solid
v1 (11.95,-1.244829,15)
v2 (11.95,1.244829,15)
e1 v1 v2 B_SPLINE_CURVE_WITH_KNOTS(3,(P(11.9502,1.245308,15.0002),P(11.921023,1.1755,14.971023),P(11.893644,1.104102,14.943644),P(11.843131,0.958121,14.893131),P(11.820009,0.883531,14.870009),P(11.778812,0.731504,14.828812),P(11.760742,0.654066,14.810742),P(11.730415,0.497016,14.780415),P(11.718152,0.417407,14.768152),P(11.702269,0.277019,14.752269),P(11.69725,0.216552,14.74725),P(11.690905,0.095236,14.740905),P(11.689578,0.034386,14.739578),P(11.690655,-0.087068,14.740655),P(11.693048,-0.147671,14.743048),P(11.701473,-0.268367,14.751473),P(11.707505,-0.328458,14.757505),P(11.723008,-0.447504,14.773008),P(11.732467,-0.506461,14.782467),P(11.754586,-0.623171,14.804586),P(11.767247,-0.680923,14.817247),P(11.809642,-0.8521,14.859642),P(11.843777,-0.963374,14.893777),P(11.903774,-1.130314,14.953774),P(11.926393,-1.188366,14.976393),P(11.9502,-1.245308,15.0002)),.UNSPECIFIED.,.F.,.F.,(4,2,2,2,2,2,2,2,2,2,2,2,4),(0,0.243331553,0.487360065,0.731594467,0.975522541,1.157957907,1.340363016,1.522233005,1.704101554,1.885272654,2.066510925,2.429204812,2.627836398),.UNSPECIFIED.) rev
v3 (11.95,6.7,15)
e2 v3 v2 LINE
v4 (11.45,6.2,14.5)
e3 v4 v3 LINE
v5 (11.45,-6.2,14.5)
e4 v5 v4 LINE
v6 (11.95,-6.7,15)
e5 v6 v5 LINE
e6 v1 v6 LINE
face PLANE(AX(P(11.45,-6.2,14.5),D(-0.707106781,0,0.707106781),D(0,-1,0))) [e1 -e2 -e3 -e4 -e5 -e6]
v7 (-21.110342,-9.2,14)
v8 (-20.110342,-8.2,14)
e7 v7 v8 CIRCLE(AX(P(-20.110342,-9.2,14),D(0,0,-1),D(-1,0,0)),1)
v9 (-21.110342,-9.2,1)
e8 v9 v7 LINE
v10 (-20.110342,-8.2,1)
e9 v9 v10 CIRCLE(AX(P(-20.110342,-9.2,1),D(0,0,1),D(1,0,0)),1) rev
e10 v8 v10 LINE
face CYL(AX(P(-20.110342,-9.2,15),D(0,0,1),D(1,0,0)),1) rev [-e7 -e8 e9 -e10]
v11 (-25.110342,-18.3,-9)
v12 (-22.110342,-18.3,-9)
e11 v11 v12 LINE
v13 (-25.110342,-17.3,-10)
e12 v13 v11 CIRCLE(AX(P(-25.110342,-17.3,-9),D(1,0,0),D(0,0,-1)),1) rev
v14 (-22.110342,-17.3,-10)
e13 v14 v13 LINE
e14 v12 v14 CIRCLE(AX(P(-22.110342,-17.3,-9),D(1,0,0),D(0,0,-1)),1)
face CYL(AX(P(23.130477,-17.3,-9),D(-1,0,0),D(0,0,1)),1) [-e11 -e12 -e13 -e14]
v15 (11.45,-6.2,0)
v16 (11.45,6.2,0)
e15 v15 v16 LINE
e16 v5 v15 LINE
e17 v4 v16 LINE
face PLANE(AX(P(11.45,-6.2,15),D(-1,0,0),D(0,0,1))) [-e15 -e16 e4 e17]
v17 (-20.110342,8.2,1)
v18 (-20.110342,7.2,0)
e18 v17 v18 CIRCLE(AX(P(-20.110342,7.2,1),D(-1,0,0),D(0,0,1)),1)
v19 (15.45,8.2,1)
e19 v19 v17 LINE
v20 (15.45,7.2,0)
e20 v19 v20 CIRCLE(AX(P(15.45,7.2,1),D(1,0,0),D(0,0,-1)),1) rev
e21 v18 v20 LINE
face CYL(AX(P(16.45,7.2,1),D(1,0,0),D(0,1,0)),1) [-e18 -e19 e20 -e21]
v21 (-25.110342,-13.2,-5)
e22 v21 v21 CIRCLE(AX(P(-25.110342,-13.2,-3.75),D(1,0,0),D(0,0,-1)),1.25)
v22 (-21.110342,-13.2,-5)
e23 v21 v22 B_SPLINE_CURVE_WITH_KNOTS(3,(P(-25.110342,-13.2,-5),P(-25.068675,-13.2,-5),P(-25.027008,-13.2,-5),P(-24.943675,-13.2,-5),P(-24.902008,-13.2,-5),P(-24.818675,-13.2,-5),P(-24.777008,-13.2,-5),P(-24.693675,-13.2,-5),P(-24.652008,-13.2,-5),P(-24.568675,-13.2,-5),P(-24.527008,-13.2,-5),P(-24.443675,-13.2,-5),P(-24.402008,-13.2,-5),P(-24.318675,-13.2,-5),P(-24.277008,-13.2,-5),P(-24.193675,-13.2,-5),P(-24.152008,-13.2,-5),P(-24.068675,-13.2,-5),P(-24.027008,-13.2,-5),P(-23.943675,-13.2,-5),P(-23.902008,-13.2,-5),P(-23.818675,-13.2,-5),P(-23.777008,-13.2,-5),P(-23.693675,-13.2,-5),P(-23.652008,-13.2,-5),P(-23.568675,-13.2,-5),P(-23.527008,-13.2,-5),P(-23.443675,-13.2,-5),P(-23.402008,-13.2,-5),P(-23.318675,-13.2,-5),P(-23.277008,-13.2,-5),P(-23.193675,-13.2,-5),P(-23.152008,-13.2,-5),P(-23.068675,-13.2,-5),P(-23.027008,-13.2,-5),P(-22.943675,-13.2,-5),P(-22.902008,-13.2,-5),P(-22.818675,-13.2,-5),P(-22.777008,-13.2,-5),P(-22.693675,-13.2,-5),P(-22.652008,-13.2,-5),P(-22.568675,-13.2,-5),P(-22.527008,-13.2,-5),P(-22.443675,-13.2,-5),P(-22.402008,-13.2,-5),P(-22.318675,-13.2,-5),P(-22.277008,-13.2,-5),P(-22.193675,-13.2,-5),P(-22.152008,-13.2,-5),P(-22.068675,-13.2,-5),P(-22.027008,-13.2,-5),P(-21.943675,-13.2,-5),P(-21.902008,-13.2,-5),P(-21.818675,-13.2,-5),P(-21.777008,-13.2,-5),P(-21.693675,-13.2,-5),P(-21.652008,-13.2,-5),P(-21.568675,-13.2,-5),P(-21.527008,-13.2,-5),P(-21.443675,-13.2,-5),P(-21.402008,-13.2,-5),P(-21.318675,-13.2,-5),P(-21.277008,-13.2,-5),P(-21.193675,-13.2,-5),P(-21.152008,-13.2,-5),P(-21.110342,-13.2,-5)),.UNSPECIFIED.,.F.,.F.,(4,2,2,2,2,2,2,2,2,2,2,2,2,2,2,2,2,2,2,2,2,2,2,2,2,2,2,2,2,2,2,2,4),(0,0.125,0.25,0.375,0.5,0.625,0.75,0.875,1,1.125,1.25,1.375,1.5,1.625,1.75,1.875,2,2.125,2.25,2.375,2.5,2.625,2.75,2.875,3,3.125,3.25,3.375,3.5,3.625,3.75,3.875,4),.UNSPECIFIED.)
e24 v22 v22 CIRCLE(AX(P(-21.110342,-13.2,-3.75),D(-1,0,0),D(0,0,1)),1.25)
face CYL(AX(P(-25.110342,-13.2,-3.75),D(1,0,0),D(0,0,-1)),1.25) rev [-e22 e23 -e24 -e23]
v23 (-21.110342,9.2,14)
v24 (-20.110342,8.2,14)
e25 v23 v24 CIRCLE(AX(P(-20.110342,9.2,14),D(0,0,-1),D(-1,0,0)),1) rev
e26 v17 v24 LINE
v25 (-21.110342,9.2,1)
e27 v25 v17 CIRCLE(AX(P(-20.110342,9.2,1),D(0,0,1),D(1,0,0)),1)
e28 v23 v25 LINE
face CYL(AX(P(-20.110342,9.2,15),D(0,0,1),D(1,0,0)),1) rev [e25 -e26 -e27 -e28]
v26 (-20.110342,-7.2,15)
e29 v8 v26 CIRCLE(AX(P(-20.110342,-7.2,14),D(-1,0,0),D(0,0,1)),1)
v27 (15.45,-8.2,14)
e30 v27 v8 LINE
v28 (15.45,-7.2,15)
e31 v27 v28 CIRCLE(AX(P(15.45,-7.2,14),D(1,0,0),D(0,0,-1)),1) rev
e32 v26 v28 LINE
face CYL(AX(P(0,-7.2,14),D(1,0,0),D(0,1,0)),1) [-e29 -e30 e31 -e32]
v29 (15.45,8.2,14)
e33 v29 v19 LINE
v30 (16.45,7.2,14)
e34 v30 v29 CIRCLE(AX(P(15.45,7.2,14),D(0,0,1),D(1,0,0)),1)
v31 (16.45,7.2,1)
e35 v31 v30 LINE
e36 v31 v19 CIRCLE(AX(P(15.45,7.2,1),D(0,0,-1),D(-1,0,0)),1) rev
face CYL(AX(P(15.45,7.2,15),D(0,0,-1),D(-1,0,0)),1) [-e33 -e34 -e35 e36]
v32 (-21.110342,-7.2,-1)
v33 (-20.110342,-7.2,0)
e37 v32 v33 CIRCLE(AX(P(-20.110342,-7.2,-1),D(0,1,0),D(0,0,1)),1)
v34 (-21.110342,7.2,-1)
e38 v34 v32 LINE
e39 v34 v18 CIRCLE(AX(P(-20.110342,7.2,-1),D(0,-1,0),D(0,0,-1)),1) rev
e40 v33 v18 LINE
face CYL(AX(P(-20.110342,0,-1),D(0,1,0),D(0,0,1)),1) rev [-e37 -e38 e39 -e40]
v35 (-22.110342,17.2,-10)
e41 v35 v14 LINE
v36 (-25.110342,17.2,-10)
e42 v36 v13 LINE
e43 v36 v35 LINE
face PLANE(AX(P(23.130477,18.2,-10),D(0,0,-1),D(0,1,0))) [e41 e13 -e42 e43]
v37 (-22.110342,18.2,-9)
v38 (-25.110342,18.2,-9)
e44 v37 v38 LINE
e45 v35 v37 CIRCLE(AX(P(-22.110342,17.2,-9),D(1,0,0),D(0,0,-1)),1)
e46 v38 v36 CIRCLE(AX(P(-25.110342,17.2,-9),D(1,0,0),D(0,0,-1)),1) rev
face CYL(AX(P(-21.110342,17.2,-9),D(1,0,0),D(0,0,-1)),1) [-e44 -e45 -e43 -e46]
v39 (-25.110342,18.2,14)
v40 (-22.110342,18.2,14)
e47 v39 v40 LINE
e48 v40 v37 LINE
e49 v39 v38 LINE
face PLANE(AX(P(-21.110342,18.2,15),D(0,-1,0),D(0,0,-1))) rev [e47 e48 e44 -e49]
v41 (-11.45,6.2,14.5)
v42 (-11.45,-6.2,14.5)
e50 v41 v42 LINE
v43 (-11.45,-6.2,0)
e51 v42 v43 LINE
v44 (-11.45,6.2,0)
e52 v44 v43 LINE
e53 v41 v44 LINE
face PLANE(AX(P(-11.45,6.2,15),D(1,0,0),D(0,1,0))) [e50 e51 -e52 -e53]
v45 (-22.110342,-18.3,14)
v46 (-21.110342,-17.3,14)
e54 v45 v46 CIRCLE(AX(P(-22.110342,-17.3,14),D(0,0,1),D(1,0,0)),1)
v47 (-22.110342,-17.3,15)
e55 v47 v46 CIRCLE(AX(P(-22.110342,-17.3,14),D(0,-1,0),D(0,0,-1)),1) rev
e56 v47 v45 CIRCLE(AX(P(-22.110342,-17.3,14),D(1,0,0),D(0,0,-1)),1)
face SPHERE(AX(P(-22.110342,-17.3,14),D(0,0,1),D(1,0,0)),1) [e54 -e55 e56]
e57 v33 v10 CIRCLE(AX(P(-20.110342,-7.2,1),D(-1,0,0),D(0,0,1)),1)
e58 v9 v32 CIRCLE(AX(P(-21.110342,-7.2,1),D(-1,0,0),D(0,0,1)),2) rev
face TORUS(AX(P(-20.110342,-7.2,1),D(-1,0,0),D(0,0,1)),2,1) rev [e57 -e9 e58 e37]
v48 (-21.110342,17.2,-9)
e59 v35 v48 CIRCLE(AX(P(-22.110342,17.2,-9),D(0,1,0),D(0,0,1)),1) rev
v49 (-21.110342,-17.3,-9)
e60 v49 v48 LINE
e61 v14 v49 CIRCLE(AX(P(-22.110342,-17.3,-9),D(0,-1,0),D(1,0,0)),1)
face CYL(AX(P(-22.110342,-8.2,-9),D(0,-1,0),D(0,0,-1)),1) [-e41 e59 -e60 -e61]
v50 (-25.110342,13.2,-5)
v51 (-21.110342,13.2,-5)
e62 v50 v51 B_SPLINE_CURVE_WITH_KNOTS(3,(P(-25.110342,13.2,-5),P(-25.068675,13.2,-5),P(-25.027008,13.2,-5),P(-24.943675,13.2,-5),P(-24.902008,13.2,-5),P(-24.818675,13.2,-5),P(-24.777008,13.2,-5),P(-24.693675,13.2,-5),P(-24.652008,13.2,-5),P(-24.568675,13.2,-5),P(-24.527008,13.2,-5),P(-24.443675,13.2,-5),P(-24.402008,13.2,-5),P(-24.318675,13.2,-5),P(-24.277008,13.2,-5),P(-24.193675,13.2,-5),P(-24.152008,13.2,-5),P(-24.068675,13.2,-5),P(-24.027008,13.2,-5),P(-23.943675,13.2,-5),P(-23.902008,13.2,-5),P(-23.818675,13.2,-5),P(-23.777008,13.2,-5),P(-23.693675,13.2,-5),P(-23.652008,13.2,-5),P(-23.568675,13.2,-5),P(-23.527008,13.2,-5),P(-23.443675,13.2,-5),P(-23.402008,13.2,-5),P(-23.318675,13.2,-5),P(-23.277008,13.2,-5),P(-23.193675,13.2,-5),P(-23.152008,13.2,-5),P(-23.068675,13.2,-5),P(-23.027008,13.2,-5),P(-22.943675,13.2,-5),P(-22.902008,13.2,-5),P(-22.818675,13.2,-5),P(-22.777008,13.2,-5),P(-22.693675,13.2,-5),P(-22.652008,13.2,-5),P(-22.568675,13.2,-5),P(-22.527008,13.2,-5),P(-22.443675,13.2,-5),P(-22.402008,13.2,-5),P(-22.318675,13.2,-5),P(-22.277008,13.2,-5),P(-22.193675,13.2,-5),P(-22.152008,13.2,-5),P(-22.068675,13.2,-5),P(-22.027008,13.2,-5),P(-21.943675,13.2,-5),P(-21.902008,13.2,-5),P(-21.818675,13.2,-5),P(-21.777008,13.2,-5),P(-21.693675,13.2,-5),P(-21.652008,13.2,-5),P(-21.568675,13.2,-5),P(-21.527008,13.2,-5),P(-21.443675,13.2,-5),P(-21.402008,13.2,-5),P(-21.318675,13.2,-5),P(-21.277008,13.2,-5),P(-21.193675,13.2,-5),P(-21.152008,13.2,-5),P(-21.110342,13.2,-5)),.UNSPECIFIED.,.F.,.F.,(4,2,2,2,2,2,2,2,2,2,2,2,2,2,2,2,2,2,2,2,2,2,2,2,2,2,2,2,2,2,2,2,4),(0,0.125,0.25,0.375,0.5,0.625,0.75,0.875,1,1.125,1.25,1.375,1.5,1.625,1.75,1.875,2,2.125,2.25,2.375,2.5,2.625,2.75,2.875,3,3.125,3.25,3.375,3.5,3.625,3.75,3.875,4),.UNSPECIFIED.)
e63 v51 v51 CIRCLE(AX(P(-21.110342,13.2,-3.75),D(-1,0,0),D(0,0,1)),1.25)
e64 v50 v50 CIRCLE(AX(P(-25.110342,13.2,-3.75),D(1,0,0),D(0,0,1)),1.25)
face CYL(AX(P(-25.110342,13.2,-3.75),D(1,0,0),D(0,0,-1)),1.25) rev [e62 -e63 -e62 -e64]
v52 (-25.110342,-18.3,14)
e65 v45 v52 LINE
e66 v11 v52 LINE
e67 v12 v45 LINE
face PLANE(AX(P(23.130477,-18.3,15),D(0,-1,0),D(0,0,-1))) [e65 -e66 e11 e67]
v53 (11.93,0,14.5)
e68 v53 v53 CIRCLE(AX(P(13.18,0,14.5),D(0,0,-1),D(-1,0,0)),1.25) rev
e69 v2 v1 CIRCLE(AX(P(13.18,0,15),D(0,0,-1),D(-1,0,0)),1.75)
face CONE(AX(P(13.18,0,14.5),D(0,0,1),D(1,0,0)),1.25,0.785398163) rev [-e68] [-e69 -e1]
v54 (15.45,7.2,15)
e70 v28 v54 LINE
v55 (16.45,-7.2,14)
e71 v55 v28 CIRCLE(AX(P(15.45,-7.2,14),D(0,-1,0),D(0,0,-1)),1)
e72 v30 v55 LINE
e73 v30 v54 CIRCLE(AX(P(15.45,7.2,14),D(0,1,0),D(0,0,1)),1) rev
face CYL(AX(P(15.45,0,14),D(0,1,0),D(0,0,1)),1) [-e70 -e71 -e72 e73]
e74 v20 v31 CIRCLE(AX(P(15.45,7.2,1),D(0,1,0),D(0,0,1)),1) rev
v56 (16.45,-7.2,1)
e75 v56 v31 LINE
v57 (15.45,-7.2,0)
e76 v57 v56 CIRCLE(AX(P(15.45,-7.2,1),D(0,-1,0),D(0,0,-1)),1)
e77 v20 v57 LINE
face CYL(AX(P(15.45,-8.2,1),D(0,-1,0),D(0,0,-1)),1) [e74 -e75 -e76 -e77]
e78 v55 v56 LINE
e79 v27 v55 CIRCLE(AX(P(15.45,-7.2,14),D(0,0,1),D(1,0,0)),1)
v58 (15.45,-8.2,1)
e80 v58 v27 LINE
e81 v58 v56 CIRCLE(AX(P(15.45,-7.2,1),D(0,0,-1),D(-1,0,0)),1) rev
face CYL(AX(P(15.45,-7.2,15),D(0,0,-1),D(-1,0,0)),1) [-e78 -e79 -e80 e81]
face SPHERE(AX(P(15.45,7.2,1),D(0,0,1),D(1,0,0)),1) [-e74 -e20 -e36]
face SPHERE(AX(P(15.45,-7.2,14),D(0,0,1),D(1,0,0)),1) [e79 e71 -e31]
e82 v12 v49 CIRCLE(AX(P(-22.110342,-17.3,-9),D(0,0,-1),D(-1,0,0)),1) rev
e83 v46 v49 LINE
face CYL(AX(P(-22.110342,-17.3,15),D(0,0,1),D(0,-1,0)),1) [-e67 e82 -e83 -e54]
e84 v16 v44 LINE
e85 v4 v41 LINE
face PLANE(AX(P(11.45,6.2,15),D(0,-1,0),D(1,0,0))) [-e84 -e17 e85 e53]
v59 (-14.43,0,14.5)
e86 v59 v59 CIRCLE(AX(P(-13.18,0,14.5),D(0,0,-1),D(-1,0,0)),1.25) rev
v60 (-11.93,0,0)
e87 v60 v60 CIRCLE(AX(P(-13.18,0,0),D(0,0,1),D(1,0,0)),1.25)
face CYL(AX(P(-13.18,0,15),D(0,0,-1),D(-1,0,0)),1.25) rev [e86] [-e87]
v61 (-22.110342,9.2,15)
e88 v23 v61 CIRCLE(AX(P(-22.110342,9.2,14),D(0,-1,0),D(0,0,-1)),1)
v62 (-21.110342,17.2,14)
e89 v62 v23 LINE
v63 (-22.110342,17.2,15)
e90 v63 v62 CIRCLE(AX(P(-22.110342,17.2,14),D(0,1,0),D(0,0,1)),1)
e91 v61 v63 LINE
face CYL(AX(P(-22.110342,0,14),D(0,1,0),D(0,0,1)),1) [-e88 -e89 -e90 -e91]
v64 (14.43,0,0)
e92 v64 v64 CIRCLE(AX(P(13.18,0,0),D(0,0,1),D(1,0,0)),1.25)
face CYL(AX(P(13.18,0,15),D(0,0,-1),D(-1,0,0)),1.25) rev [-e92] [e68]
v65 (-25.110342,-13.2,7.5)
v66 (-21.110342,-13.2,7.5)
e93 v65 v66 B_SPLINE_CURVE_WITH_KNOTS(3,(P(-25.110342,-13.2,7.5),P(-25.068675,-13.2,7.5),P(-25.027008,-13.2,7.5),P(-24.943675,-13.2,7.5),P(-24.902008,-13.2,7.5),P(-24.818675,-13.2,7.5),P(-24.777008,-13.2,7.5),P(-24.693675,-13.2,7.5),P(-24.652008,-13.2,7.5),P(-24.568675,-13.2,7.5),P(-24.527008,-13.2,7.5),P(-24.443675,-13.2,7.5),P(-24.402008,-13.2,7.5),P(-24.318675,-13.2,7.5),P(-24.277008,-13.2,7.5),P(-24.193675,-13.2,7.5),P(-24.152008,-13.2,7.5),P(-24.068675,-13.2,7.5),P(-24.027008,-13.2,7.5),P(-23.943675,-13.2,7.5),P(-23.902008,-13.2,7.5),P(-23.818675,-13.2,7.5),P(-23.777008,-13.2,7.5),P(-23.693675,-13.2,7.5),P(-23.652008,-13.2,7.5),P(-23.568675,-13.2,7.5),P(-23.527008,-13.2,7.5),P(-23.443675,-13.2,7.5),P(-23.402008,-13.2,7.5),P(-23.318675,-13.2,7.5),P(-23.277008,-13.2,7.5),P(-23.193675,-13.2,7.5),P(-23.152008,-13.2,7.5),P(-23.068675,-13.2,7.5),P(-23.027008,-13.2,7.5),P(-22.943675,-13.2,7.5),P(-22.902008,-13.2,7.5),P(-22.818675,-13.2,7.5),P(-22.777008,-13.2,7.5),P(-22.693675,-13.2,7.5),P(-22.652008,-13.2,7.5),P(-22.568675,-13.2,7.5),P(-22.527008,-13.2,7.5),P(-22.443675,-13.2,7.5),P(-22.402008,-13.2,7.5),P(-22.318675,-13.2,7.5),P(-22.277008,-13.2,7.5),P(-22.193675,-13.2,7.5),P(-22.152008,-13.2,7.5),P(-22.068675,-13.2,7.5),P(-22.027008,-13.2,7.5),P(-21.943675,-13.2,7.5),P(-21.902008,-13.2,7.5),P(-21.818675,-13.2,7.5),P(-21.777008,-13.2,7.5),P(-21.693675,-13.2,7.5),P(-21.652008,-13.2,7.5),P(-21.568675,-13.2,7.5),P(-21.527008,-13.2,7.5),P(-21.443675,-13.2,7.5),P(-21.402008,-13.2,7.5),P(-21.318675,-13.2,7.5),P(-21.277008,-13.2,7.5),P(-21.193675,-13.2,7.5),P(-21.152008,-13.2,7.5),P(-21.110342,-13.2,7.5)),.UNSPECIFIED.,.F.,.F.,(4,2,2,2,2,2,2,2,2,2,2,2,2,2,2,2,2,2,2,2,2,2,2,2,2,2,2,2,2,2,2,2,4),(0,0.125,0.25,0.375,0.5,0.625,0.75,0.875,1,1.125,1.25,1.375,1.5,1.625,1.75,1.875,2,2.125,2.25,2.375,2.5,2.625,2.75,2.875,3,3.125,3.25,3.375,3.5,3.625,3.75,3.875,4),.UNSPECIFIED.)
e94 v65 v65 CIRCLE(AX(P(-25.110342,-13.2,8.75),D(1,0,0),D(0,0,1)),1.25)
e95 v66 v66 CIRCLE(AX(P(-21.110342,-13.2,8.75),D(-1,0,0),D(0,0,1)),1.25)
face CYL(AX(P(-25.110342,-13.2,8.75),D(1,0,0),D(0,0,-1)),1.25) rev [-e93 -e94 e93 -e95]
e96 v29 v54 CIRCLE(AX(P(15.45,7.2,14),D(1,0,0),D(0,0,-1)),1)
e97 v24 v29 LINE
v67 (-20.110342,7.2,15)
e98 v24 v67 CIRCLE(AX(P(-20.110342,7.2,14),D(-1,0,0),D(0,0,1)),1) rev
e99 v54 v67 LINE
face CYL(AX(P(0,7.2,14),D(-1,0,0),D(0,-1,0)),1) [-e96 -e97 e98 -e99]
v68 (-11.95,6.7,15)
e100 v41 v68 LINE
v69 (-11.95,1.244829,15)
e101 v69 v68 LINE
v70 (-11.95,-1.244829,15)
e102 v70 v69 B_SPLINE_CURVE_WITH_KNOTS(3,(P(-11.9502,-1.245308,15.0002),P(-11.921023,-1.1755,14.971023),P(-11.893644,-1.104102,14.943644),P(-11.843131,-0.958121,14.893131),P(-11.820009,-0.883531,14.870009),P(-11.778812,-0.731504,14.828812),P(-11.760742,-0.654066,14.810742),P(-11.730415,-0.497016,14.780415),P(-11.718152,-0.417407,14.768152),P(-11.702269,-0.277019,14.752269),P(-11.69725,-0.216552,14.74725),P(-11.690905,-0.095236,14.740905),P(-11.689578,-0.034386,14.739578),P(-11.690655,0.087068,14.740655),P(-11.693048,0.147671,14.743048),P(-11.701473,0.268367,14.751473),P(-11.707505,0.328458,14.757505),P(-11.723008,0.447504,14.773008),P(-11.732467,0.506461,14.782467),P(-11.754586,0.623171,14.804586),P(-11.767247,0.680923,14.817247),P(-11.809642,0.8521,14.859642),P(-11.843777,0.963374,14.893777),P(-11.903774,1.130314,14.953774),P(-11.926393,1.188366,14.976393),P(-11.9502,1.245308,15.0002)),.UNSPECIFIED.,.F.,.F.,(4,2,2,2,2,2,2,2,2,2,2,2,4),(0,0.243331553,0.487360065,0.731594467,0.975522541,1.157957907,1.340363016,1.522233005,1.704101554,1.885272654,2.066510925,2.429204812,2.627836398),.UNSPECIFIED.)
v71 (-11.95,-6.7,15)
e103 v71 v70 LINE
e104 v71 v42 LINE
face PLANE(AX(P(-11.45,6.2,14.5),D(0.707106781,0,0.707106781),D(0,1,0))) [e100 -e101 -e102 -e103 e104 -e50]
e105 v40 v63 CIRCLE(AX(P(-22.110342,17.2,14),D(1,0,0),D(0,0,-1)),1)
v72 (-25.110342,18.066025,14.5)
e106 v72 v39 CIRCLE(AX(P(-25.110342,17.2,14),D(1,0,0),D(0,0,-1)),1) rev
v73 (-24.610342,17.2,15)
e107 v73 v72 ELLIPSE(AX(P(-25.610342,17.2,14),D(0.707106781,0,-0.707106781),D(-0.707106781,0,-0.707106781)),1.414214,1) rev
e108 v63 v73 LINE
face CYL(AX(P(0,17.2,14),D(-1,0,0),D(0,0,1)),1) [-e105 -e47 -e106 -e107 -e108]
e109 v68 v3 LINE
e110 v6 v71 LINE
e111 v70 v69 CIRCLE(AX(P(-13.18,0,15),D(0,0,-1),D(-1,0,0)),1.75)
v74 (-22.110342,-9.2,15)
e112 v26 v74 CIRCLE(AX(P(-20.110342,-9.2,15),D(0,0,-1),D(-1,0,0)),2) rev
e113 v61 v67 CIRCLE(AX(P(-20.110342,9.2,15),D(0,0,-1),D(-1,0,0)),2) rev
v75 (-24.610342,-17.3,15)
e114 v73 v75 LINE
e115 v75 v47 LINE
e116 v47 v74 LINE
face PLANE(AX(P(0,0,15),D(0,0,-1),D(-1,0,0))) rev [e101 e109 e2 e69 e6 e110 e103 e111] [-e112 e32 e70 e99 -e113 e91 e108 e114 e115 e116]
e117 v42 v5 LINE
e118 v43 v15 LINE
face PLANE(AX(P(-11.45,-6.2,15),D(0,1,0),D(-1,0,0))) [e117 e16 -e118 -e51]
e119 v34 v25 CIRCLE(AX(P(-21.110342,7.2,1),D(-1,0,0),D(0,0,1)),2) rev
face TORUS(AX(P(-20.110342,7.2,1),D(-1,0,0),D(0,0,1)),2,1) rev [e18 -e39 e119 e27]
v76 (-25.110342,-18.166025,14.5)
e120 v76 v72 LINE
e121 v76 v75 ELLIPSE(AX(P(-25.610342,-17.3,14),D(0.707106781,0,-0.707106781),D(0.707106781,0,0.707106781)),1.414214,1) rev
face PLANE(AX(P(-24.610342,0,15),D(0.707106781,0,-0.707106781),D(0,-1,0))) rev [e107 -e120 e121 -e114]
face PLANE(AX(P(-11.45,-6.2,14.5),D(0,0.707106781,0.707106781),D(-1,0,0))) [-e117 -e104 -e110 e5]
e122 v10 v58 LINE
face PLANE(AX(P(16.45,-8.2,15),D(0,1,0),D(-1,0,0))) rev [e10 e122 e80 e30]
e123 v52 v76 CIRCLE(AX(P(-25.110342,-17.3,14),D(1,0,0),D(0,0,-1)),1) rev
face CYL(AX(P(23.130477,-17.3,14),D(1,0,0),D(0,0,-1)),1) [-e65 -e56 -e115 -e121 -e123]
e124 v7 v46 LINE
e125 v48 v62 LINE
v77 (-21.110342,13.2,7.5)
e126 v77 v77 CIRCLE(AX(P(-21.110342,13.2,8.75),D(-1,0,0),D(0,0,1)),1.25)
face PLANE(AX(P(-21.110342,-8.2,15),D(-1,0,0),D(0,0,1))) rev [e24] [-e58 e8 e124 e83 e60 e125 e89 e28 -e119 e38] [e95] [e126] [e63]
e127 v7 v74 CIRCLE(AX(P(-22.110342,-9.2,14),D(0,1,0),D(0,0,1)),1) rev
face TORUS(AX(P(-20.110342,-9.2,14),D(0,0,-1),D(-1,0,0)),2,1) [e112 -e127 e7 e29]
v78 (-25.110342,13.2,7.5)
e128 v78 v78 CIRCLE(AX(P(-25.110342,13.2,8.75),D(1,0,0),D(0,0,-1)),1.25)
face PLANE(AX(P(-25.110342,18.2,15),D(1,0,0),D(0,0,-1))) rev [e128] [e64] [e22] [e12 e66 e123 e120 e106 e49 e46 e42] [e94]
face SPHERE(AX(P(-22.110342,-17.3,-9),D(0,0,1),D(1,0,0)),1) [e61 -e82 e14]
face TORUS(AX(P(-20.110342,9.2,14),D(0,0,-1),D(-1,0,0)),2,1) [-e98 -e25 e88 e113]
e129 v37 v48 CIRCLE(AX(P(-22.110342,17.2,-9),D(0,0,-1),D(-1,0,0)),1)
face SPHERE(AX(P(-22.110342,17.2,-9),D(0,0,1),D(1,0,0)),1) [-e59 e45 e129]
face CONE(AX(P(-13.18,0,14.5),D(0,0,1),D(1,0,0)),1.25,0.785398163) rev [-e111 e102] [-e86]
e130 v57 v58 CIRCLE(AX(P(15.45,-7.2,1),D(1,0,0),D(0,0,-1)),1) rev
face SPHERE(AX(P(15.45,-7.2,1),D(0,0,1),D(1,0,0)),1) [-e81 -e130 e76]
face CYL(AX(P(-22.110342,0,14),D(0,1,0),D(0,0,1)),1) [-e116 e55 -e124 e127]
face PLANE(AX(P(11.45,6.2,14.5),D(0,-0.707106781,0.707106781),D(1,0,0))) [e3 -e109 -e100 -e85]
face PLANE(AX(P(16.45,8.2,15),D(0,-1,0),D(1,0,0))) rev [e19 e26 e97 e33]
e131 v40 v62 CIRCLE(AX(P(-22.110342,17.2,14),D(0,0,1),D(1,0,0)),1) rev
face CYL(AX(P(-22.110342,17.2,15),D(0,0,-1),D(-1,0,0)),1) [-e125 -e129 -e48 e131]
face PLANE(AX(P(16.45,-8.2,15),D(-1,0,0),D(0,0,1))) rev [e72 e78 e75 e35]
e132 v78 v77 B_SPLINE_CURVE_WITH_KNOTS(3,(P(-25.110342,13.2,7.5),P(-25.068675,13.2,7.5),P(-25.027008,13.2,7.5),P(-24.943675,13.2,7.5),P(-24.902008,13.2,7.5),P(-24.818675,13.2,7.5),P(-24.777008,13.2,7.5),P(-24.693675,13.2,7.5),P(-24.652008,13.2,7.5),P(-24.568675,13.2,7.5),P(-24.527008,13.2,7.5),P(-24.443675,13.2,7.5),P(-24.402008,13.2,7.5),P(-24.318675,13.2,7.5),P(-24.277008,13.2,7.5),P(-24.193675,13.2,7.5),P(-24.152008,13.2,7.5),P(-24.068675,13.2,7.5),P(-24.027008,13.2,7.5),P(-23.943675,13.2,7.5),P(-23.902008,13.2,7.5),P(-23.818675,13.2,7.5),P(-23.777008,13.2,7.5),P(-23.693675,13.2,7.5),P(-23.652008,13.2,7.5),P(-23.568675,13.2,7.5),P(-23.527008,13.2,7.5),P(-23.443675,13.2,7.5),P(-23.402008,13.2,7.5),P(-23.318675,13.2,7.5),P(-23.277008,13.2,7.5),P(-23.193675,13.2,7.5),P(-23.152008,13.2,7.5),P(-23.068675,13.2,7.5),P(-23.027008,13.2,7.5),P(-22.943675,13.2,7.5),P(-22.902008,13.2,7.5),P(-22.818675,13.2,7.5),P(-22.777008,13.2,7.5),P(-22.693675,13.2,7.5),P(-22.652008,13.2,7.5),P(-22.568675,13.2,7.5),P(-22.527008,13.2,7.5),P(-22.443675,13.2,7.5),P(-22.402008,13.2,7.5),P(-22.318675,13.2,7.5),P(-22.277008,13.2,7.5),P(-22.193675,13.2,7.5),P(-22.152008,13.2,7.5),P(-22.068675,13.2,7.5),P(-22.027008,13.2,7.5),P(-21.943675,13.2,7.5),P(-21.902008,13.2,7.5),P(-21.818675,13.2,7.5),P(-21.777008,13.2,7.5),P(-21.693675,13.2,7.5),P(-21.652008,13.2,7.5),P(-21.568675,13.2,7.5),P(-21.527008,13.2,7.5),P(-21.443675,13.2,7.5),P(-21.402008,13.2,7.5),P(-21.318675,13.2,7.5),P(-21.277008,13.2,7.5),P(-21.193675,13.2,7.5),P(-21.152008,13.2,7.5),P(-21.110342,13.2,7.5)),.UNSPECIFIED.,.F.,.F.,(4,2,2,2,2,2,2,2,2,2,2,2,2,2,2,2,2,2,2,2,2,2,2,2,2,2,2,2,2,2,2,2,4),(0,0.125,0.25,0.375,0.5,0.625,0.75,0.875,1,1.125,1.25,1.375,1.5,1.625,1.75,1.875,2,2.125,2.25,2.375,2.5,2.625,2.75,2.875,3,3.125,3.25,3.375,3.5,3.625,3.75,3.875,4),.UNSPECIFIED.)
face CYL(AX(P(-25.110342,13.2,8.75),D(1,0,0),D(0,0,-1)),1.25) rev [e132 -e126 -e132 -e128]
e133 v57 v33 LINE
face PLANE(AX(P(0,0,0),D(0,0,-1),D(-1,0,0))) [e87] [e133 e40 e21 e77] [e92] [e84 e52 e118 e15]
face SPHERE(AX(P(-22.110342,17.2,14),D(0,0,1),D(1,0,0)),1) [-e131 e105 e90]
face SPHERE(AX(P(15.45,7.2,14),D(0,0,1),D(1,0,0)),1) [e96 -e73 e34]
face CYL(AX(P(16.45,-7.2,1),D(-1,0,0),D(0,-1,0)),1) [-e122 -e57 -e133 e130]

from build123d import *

# Parameters (mm, degrees)
SKETCH1_R           = 1.25
SKETCH1_W           = 22.9
SKETCH1_H           = 12.4
BOSS_EXTRUDE1_DEPTH = 15
SKETCH4_W           = 25
SKETCH4_H           = 36.5
BOSS_EXTRUDE2_DEPTH = 4
SKETCH3_R           = 1.25
CUT_EXTRUDE1_DEPTH  = 35.502452959
CHAMFER1_SIZE       = 0.5
FILLET1_R           = 1


with BuildPart() as part:
    # Sketch1 → Boss-Extrude1 (new body)
    with BuildSketch(Plane.XY):
        Polygon((16.45, -8.2), (16.45, 8.2), (-21.110341698, 8.2), (-21.110341698, 18.2), (-25.110341698, 18.2), (-25.110341698, -18.2), (-21.110341698, -18.2), (-21.110341698, -8.2), align=None)
        with Locations((13.18, 0)):
            Circle(SKETCH1_R, mode=Mode.SUBTRACT)
        with Locations((-13.18, 0)):
            Circle(SKETCH1_R, mode=Mode.SUBTRACT)
        Rectangle(SKETCH1_W, SKETCH1_H, mode=Mode.SUBTRACT)
    extrude(amount=BOSS_EXTRUDE1_DEPTH)

    # Sketch4 → Boss-Extrude2 (add)
    with BuildSketch(Plane.ZY.offset(25.110341698)):
        with Locations((2.5, -0.05)):
            Rectangle(SKETCH4_W, SKETCH4_H)
    extrude(amount=-BOSS_EXTRUDE2_DEPTH)

    # Sketch3 → Cut-Extrude1 (cut, through all)
    with BuildSketch(Plane(origin=(0, 0, 0), x_dir=(0, 0, -1), z_dir=(1, 0, 0))):
        with Locations((-8.75, 13.2)):
            Circle(SKETCH3_R)
        with Locations((3.75, 13.2)):
            Circle(SKETCH3_R)
        with Locations((3.75, -13.2)):
            Circle(SKETCH3_R)
        with Locations((-8.75, -13.2)):
            Circle(SKETCH3_R)
    extrude(amount=-CUT_EXTRUDE1_DEPTH, mode=Mode.SUBTRACT)

    # Chamfer1
    # the kernel refuses this chamfer: 0.5 mm, written as the material it takes off along each edge
    with BuildSketch(Plane(origin=(-25.110341698, 19.485841494, 15), x_dir=(0.9996219169112968, 0, 0.02749587661058555), z_dir=(0, -1, 0))) as chamfer1_piece_1:
        Polygon((CHAMFER1_SIZE * 0.999621916911, -CHAMFER1_SIZE * 0.0274958766106), (-CHAMFER1_SIZE * 0.0274958766106, -CHAMFER1_SIZE * 0.999621916911), (0, 0), align=None)
    extrude(amount=39.071682988, mode=Mode.SUBTRACT)
    with BuildSketch(Plane(origin=(11.45, -6.2, 15), x_dir=(0.9996219169112968, 0, 0.02749587661058574), z_dir=(0, 1, 0)), Plane(origin=(-11.45, 6.2, 15), x_dir=(-0.9996219169112968, 0, 0.027495876610585647), z_dir=(0, -1, 0))) as chamfer1_piece_2:
        Polygon((CHAMFER1_SIZE * 0.999621916911, CHAMFER1_SIZE * 0.0274958766106), (-CHAMFER1_SIZE * 0.0274958766106, CHAMFER1_SIZE * 0.999621916911), (0, 0), align=None)
    extrude(amount=12.4, mode=Mode.SUBTRACT)
    with BuildSketch(Plane(origin=(11.45, 6.2, 15), x_dir=(0, 0.9996219169112968, 0.027495876610585647), z_dir=(-1, 0, 0)), Plane(origin=(-11.45, -6.2, 15), x_dir=(0, -0.9996219169112968, 0.027495876610585647), z_dir=(1, 0, 0))) as chamfer1_piece_3:
        Polygon((CHAMFER1_SIZE * 0.999621916911, CHAMFER1_SIZE * 0.0274958766106), (-CHAMFER1_SIZE * 0.0274958766106, CHAMFER1_SIZE * 0.999621916911), (0, 0), align=None)
    extrude(amount=22.9, mode=Mode.SUBTRACT)
    with BuildSketch(Plane(origin=(13.18, 0, 15), x_dir=(1, 0, 0), z_dir=(0, -1, 0))) as chamfer1_piece_4:
        Polygon((1.25 + CHAMFER1_SIZE, 0), (1.25, -CHAMFER1_SIZE), (1.25, 0), align=None)
    revolve(axis=Axis((13.18, 0, 15), (0, 0, 1)), mode=Mode.SUBTRACT)
    with BuildSketch(Plane(origin=(-13.18, 0, 15), x_dir=(1, 0, 0), z_dir=(0, -1, 0))) as chamfer1_piece_5:
        Polygon((1.25 + CHAMFER1_SIZE, 0), (1.25, -CHAMFER1_SIZE), (1.25, 0), align=None)
    revolve(axis=Axis((-13.18, 0, 15), (0, 0, 1)), mode=Mode.SUBTRACT)
    with BuildSketch(Plane(origin=(11.45, -7.485841494, 15), x_dir=(0.9996219169112968, 0, 0.027495876610585647), z_dir=(0, 1, 0))) as chamfer1_piece_6a_section:
        Polygon((CHAMFER1_SIZE * 0.999621916911, CHAMFER1_SIZE * 0.0274958766106), (-CHAMFER1_SIZE * 0.0274958766106, CHAMFER1_SIZE * 0.999621916911), (0, 0), align=None)
    chamfer1_piece_6a = extrude(amount=13.685841494, mode=Mode.PRIVATE)
    chamfer1_piece_6a = split(chamfer1_piece_6a, bisect_by=Plane(origin=(11.614896813, -6.2, 14.835103187), z_dir=(0, -1, 0)), keep=Keep.TOP, mode=Mode.PRIVATE)
    with BuildSketch(Plane(origin=(-11.45, -6.2, 15), x_dir=(0, -0.9996219169112968, 0.027495876610585647), z_dir=(1, 0, 0))) as chamfer1_piece_6b_section:
        Polygon((CHAMFER1_SIZE * 0.999621916911, CHAMFER1_SIZE * 0.0274958766106), (-CHAMFER1_SIZE * 0.0274958766106, CHAMFER1_SIZE * 0.999621916911), (0, 0), align=None)
    chamfer1_piece_6b = extrude(amount=24.185841494, mode=Mode.PRIVATE)
    chamfer1_piece_6b = split(chamfer1_piece_6b, bisect_by=Plane(origin=(11.45, -6.364896813, 14.835103187), z_dir=(1, 0, 0)), keep=Keep.TOP, mode=Mode.PRIVATE)
    chamfer1_piece_6 = chamfer1_piece_6a & chamfer1_piece_6b
    add(chamfer1_piece_6, mode=Mode.SUBTRACT)
    with BuildSketch(Plane(origin=(11.45, -6.2, 15), x_dir=(0.9996219169112968, 0, 0.02749587661058574), z_dir=(0, 1, 0))) as chamfer1_piece_7a_section:
        Polygon((CHAMFER1_SIZE * 0.999621916911, CHAMFER1_SIZE * 0.0274958766106), (-CHAMFER1_SIZE * 0.0274958766106, CHAMFER1_SIZE * 0.999621916911), (0, 0), align=None)
    chamfer1_piece_7a = extrude(amount=13.685841494, mode=Mode.PRIVATE)
    chamfer1_piece_7a = split(chamfer1_piece_7a, bisect_by=Plane(origin=(11.614896813, 6.2, 14.835103187), z_dir=(0, 1, 0)), keep=Keep.TOP, mode=Mode.PRIVATE)
    with BuildSketch(Plane(origin=(12.735841494, 6.2, 15), x_dir=(0, 0.9996219169112968, 0.027495876610585647), z_dir=(-1, 0, 0))) as chamfer1_piece_7b_section:
        Polygon((CHAMFER1_SIZE * 0.999621916911, CHAMFER1_SIZE * 0.0274958766106), (-CHAMFER1_SIZE * 0.0274958766106, CHAMFER1_SIZE * 0.999621916911), (0, 0), align=None)
    chamfer1_piece_7b = extrude(amount=24.185841494, mode=Mode.PRIVATE)
    chamfer1_piece_7b = split(chamfer1_piece_7b, bisect_by=Plane(origin=(11.45, 6.364896813, 14.835103187), z_dir=(1, 0, 0)), keep=Keep.TOP, mode=Mode.PRIVATE)
    chamfer1_piece_7 = chamfer1_piece_7a & chamfer1_piece_7b
    add(chamfer1_piece_7, mode=Mode.SUBTRACT)
    with BuildSketch(Plane(origin=(-11.45, 7.485841494, 15), x_dir=(-0.9996219169112968, 0, 0.027495876610585647), z_dir=(0, -1, 0))) as chamfer1_piece_8a_section:
        Polygon((CHAMFER1_SIZE * 0.999621916911, CHAMFER1_SIZE * 0.0274958766106), (-CHAMFER1_SIZE * 0.0274958766106, CHAMFER1_SIZE * 0.999621916911), (0, 0), align=None)
    chamfer1_piece_8a = extrude(amount=13.685841494, mode=Mode.PRIVATE)
    chamfer1_piece_8a = split(chamfer1_piece_8a, bisect_by=Plane(origin=(-11.614896813, 6.2, 14.835103187), z_dir=(0, 1, 0)), keep=Keep.TOP, mode=Mode.PRIVATE)
    with BuildSketch(Plane(origin=(11.45, 6.2, 15), x_dir=(0, 0.9996219169112968, 0.027495876610585647), z_dir=(-1, 0, 0))) as chamfer1_piece_8b_section:
        Polygon((CHAMFER1_SIZE * 0.999621916911, CHAMFER1_SIZE * 0.0274958766106), (-CHAMFER1_SIZE * 0.0274958766106, CHAMFER1_SIZE * 0.999621916911), (0, 0), align=None)
    chamfer1_piece_8b = extrude(amount=24.185841494, mode=Mode.PRIVATE)
    chamfer1_piece_8b = split(chamfer1_piece_8b, bisect_by=Plane(origin=(-11.45, 6.364896813, 14.835103187), z_dir=(-1, 0, 0)), keep=Keep.TOP, mode=Mode.PRIVATE)
    chamfer1_piece_8 = chamfer1_piece_8a & chamfer1_piece_8b
    add(chamfer1_piece_8, mode=Mode.SUBTRACT)
    with BuildSketch(Plane(origin=(-12.735841494, -6.2, 15), x_dir=(0, -0.9996219169112968, 0.027495876610585647), z_dir=(1, 0, 0))) as chamfer1_piece_9a_section:
        Polygon((CHAMFER1_SIZE * 0.999621916911, CHAMFER1_SIZE * 0.0274958766106), (-CHAMFER1_SIZE * 0.0274958766106, CHAMFER1_SIZE * 0.999621916911), (0, 0), align=None)
    chamfer1_piece_9a = extrude(amount=24.185841494, mode=Mode.PRIVATE)
    chamfer1_piece_9a = split(chamfer1_piece_9a, bisect_by=Plane(origin=(-11.45, -6.364896813, 14.835103187), z_dir=(-1, 0, 0)), keep=Keep.TOP, mode=Mode.PRIVATE)
    with BuildSketch(Plane(origin=(-11.45, 6.2, 15), x_dir=(-0.9996219169112968, 0, 0.027495876610585647), z_dir=(0, -1, 0))) as chamfer1_piece_9b_section:
        Polygon((CHAMFER1_SIZE * 0.999621916911, CHAMFER1_SIZE * 0.0274958766106), (-CHAMFER1_SIZE * 0.0274958766106, CHAMFER1_SIZE * 0.999621916911), (0, 0), align=None)
    chamfer1_piece_9b = extrude(amount=13.685841494, mode=Mode.PRIVATE)
    chamfer1_piece_9b = split(chamfer1_piece_9b, bisect_by=Plane(origin=(-11.614896813, -6.2, 14.835103187), z_dir=(0, -1, 0)), keep=Keep.TOP, mode=Mode.PRIVATE)
    chamfer1_piece_9 = chamfer1_piece_9a & chamfer1_piece_9b
    add(chamfer1_piece_9, mode=Mode.SUBTRACT)

    # Fillet1
    fillet1_edges = [part.edges().sort_by_distance(p)[0] for p in [
        (-21.110341698, -13.25, 15),
        (-21.110341698, 0, 0),
        (-21.110341698, 13.2, 15),
        (-21.110341698, -8.2, 7.5),
        (-2.330170849, -8.2, 15),
        (-2.330170849, -8.2, 0),
        (-2.330170849, 8.2, 15),
        (-21.110341698, 8.2, 7.5),
        (-2.330170849, 8.2, 0),
        (16.45, -8.2, 7.5),
        (16.45, 0, 15),
        (16.45, 8.2, 7.5),
        (16.45, 0, 0),
        (-21.110341698, 18.2, 2.5),
        (-22.860341698, 18.2, 15),
        (-23.110341698, -18.3, -10),
        (-23.110341698, 18.2, -10),
        (-21.110341698, -0.05, -10),
        (-22.860341698, -18.3, 15),
        (-21.110341698, -18.3, 2.5),
    ]]
    fillet(fillet1_edges, radius=FILLET1_R)


solid = part.part
